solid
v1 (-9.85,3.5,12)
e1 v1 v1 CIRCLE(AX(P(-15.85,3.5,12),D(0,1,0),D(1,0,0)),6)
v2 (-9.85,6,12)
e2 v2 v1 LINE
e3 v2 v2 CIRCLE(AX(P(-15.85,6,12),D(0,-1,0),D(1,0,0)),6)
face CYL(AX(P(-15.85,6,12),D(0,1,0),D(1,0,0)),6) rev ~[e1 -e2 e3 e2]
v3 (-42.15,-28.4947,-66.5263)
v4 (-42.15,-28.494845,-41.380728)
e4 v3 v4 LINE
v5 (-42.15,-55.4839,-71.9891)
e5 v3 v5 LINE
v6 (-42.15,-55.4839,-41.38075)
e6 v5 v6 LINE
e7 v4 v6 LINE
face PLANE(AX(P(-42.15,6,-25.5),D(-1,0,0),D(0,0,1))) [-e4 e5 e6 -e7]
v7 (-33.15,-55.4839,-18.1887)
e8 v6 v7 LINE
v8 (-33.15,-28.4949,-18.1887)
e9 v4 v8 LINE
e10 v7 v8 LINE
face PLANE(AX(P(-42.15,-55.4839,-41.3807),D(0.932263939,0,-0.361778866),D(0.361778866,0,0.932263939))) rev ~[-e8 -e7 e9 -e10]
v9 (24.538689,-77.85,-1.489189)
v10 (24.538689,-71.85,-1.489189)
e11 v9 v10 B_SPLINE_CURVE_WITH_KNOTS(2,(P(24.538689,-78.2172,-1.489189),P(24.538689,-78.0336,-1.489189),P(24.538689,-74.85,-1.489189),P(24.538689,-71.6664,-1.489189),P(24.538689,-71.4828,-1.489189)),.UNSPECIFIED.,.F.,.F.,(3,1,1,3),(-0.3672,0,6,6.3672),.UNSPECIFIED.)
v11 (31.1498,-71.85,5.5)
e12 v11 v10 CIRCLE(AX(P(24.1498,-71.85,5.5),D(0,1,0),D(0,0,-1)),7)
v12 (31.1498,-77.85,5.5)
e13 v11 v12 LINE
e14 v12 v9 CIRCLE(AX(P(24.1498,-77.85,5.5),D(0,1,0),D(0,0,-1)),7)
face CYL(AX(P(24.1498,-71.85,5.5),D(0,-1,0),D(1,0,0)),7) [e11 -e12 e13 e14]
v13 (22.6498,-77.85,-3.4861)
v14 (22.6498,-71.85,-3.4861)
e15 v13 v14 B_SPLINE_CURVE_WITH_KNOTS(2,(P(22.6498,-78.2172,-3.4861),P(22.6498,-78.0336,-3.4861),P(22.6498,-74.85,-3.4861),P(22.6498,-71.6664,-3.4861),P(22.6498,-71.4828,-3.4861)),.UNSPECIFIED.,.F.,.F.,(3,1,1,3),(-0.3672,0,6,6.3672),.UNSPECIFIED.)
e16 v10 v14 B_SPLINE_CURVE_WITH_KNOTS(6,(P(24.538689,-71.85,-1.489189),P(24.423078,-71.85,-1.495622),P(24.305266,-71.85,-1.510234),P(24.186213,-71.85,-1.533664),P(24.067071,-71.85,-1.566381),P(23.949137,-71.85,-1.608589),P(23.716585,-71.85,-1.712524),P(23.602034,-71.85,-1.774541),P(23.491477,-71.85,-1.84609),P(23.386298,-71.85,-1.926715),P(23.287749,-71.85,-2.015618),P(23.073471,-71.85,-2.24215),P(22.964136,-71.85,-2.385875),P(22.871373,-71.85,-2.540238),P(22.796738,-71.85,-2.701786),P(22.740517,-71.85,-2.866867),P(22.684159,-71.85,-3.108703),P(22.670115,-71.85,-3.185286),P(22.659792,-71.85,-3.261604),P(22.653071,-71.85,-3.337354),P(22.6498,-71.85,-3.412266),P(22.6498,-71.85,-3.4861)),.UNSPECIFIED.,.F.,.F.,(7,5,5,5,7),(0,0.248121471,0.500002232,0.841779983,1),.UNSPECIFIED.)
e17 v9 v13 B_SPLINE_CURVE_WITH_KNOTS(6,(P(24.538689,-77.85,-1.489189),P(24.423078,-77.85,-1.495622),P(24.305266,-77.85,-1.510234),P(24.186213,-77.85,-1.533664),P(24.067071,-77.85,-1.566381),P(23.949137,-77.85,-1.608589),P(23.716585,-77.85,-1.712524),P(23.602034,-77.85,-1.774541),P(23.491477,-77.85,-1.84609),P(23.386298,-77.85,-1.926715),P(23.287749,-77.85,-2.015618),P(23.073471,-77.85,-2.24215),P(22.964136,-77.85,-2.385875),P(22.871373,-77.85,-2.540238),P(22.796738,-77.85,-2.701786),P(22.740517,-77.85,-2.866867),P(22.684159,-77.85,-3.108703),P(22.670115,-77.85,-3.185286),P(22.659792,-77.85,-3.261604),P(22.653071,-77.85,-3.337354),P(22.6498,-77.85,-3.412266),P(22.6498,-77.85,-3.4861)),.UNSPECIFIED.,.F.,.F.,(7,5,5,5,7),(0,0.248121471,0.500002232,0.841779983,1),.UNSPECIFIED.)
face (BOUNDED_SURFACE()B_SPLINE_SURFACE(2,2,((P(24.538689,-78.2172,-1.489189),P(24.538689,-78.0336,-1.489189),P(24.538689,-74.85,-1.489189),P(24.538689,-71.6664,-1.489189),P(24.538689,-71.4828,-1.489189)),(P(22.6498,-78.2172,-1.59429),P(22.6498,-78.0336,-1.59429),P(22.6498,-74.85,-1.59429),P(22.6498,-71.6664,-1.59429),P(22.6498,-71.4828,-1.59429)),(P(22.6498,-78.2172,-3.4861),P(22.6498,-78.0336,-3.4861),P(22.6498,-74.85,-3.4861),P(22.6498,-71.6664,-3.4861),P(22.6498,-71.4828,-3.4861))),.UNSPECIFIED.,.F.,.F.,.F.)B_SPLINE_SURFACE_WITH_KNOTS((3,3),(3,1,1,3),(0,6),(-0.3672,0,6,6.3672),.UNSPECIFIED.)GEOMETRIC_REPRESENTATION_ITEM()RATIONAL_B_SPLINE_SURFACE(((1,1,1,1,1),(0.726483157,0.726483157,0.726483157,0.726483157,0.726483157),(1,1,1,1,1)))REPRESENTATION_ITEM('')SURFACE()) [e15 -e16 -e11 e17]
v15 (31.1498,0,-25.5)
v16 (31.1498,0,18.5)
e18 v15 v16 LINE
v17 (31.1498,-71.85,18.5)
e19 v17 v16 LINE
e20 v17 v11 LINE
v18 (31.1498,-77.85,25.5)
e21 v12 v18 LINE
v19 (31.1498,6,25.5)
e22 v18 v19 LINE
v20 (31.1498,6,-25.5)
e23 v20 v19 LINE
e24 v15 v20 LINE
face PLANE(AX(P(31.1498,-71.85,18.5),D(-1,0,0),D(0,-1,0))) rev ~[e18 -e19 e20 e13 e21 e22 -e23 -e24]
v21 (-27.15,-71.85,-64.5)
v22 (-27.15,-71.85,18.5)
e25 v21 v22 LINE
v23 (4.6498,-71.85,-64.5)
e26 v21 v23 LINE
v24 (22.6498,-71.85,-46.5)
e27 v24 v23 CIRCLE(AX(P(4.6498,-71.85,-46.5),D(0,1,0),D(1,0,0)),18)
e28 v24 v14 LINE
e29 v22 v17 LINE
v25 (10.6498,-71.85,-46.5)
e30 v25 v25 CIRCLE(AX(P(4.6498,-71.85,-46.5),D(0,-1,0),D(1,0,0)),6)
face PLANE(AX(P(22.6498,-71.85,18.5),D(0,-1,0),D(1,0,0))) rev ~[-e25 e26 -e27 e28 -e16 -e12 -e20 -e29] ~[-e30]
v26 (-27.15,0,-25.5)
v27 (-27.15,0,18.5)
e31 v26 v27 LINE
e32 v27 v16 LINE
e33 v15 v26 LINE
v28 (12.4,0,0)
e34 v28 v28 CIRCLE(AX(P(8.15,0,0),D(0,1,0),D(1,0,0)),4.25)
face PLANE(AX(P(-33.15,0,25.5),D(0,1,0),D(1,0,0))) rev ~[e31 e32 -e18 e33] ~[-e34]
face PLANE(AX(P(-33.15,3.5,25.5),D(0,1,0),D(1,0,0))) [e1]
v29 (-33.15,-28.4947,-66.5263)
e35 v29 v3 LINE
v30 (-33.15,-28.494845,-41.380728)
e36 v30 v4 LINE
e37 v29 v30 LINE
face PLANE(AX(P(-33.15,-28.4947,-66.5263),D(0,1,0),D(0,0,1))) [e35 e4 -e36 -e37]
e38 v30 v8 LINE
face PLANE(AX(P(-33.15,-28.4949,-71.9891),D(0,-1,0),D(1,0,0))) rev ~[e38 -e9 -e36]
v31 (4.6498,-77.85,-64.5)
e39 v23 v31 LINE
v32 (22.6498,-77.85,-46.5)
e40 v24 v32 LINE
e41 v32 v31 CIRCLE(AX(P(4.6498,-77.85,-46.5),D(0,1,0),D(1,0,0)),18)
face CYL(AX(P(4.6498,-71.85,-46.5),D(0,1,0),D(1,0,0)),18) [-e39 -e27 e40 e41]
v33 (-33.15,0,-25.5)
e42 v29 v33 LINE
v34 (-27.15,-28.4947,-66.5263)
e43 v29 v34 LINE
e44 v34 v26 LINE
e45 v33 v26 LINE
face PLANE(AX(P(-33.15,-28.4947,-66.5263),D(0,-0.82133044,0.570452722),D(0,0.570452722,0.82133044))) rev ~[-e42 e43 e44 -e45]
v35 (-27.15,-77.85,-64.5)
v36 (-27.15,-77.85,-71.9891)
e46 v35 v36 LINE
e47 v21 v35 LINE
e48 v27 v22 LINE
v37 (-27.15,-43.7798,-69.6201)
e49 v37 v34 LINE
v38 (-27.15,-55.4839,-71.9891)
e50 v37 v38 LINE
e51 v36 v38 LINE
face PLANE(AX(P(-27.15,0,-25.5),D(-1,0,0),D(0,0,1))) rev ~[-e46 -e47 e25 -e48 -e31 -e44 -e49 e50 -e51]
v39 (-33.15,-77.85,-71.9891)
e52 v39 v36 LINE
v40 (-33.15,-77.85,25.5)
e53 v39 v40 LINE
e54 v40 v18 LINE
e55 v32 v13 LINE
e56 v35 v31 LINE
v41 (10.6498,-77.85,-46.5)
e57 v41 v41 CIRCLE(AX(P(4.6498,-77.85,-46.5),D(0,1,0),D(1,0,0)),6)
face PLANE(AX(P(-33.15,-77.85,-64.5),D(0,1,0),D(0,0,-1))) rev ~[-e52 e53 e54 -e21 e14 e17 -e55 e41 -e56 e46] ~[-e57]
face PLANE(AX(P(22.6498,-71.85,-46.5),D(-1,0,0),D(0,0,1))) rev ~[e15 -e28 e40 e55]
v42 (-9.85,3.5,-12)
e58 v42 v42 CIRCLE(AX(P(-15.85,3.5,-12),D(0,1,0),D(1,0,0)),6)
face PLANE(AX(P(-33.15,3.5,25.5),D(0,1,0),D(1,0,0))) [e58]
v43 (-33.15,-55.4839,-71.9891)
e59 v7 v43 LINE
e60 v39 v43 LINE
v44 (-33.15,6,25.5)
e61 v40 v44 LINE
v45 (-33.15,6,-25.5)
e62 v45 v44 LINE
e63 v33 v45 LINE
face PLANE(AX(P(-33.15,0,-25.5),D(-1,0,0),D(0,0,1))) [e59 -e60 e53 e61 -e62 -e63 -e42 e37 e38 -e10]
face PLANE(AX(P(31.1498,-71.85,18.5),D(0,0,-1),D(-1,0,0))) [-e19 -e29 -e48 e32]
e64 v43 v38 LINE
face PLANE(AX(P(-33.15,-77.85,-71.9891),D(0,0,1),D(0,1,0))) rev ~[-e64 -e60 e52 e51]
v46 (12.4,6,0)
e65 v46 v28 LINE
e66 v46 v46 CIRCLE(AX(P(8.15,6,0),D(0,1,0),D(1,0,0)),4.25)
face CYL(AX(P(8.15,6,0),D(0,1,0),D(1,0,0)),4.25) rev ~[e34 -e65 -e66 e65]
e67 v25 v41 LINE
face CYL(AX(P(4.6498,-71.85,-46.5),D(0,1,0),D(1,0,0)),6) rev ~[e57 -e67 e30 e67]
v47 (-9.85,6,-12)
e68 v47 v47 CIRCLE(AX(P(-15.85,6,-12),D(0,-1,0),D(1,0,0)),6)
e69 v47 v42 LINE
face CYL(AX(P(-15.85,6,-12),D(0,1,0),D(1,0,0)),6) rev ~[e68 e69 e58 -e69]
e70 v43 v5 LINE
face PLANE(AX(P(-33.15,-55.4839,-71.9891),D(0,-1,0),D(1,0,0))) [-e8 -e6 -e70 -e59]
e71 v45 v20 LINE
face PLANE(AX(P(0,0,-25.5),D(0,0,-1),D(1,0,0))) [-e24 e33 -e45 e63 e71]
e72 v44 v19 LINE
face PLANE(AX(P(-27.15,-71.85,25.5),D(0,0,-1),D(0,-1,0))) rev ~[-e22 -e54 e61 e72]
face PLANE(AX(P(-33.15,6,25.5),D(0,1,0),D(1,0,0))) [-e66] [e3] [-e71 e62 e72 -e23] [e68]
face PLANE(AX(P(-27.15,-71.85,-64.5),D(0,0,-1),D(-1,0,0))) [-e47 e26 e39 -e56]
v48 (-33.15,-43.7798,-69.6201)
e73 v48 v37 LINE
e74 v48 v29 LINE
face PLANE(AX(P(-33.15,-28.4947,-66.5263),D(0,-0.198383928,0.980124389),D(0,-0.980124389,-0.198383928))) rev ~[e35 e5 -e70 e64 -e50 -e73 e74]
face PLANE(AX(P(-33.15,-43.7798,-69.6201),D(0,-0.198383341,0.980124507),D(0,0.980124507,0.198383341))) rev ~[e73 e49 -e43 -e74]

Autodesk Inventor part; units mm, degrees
ref_plane "YZ Plane" through (0, 0, 0) normal (1, 0, 0) x (0, 1, 0)
ref_plane "XZ Plane" through (0, 0, 0) normal (0, 1, 0) x (-1, 0, 0)
ref_plane "XY Plane" through (0, 0, 0) normal (0, 0, 1) x (1, 0, 0)
sketch "Sketch1" plane through (0, 0, 0) normal (0, 1, 0) x (-1, 0, 0)
  line L0 (0, -25.5) -> (-34.15, -25.5)
  line L1 (-34.15, -25.5) -> (-34.15, 0)
  line L2 (-34.15, 0) -> (-34.15, 25.5)
  line L3 (-34.15, 25.5) -> (0, 25.5)
  line L4 (0, 25.5) -> (34.15, 25.5)
  line L5 (34.15, 25.5) -> (34.15, 0)
  line L6 (34.15, 0) -> (34.15, -25.5)
  line L7 (34.15, -25.5) -> (0, -25.5)
  point P0 (0, 0)
extrude "Extrusion1" add sketch "Sketch1" along normal blind 7
sketch "Sketch3" plane through (-34.15, 0, 25.5) normal (0, 0, 1) x (1, 0, 0)
  line L0 (0, 0) -> (0, -78.85)
  point P0 (34.15, 0)
  dimension "d7" = 78.85
sketch "Sketch4" plane through (-34.15, 0, -25.5) normal (-1, 0, 0) x (0, 0, 1)
  line L0 (51, 0) -> (51, -78.85)
  line L1 (51, -78.85) -> (-39, -78.85)
  line L2 (-39, -78.85) -> (-39, -71.85)
  line L3 (0, 0) -> (-39, -71.85)
  line L4 (0, 0) -> (51, 0)
  point P0 (25.5, 0)
  dimension "d10" = 90
  dimension "d11" = 7
extrude "Extrusion2" add sketch "Sketch4" against normal blind 7
sketch "Sketch6" plane through (0, 7, 0) normal (0, 1, 0) x (1, 0, 0)
  line L0 (34.15, -25.5) -> (34.15, 25.5) projected
  line L1 (34.15, 25.5) -> (34.15, 0)
  line L2 (-34.15, 25.5) -> (-34.15, -25.5) projected
  circle A0 centre (8.15, 0) radius 5
  point P0 (0, 0)
  dimension "d20" = 10
extrude "Extrusion4" cut sketch "Sketch6" against normal blind 10
sketch "Sketch7" plane through (-27.15, 0, -25.5) normal (1, 0, 0) x (0, 0, -1)
  line L0 (-51, -78.85) -> (39, -78.85) projected
  line L1 (-51, -78.85) -> (39, -78.85)
  line L2 (39, -78.85) -> (39, -71.85) projected
  line L3 (39, -78.85) -> (39, -71.85)
  line L4 (39, -71.85) -> (-51, -71.85)
  line L5 (-51, 0) -> (-51, -78.85) projected
  line L6 (-51, -78.85) -> (-51, -71.85)
  point P0 (-25.5, 0)
sketch "Sketch8" plane through (0, 0, 0) normal (0, -1, 0) x (1, 0, 0)
  circle A0 centre (8.15, 0) radius 5 projected
  line L0 (8.15, 18.5) -> (34.15, 18.5)
  line L1 (34.15, 25.5) -> (34.15, -25.5) projected
  line L2 (8.15, 25.5) -> (34.15, 25.5)
  line L3 (8.15, 25.5) -> (-27.15, 25.5)
  line L4 (-27.15, 25.5) -> (-27.15, -25.5) projected
  line L5 (8.15, 18.5) -> (-27.15, 18.5)
  line L6 (34.15, 25.5) -> (34.15, 18.5)
  line L7 (-27.15, 25.5) -> (-27.15, 18.5)
  point P0 (0, 0)
extrude "Extrusion6" add sketch "Sketch7" along normal blind 58.5
extrude "Extrusion7" add sketch "Sketch8" along normal blind 78.75 contours L5 L4 L3 L2 L1 L0
sketch "Sketch9" plane through (31.35, 0, -25.5) normal (1, 0, 0) x (0, 0, -1)
  line L0 (-51, -78.75) -> (-51, 7) projected
  line L1 (-44, 0) -> (-44, -71.85) projected
  line L2 (-51, -78.75) -> (-44, -78.75)
  line L3 (-44, -78.75) -> (-44, -71.85)
  line L4 (-44, -71.85) -> (-51, -71.85)
  line L5 (-51, -71.85) -> (-51, -78.75)
  point P0 (-25.5, 0)
extrude "Extrusion8" cut sketch "Sketch9" along normal blind 10
sketch "Sketch10" plane through (0, 7, 0) normal (0, 1, 0) x (1, 0, 0)
  point P0 (0, 0)
sketch "Boceto11" plane through (-34.15, -78.85, -64.5) normal (0, -1, 0) x (1, 0, 0)
  line L0 (72.0718, 89.9914) -> (72.0718, 37.9883)
  line L1 (72.0718, 37.9883) -> (65.5278, 37.9883)
  line L2 (65.5278, 37.9883) -> (65.5278, 89.9914)
  line L3 (72.0718, 89.9914) -> (72.0718, 92.1751)
  line L4 (72.0718, 92.1751) -> (65.5278, 92.1751)
  line L5 (65.5278, 92.1751) -> (65.5278, 89.9914)
  point P0 (34.15, 64.5)
extrude "Extrusión9" cut sketch "Boceto11" against normal blind 1000
sketch "Boceto18" plane through (-34.15, -78.85, 25.5) normal (0, 0, 1) x (1, 0, 0)
  point P0 (34.15, 78.85)
sketch "Boceto23" plane through (-27.15, 0, -25.5) normal (0, 0.4770514, -0.8788754) x (-1, 0, 0)
  point P0 (-27.15, 12.1648)
sketch "Boceto24" plane through (-27.15, 0, -25.5) normal (0, 0, -1) x (-1, 0, 0)
  line L0 (7, -71.85) -> (7, -78.85) projected
  line L1 (7, -78.35) -> (7, -78.85)
  line L2 (7, -78.85) -> (-58.5, -78.85) projected
  line L3 (-58.5, -78.85) -> (-58.5, -77.85)
  line L4 (-58.5, -71.85) -> (-58.5, -78.85) projected
  line L5 (-58.5, -77.85) -> (6, -77.85)
  line L6 (7, -77.85) -> (7, -78.85)
  line L7 (7, -78.85) -> (-58.8392, -78.85)
  line L8 (-58.5278, 7) -> (7, 7) projected
  line L9 (7, -78.85) -> (7, 7)
  line L10 (7, 7) -> (6, 7)
  line L11 (6, 6) -> (6, -77.85)
  line L12 (-58.5278, -71.85) -> (-58.5278, 7) projected
  line L13 (-58.5278, 7) -> (-58.5278, 6)
  line L14 (-58.5278, 6) -> (6, 6)
  line L15 (7, 0) -> (7, 7) projected
  line L16 (7, 6) -> (7, 7)
  line L17 (7, 7) -> (-58.5278, 7)
  point P0 (-27.15, 0)
  dimension "d65" = 1
  dimension "d66" = 1
  dimension "d67" = 1
extrude "Extrusión19" cut sketch "Boceto24" along normal mid plane 1000
sketch "Boceto25" plane through (31.35, -71.85, -64.5) normal (0, 0, -1) x (-1, 0, 0)
  point P0 (31.35, 71.85)
sketch "Boceto27" plane through (31.3778, 0, -25.5) normal (0, 0, -1) x (-1, 0, 0)
  line L0 (0, -71.85) -> (0, 6) projected
  line L1 (0, 6) -> (0.228, 6)
  line L2 (0, 6) -> (64.5278, 6) projected
  line L3 (0.228, 6) -> (0.228, -77.85)
  line L4 (0.0278, -77.85) -> (64.5278, -77.85) projected
  line L5 (0.0278, -71.85) -> (0.0278, -77.85) projected
  line L6 (0.228, -77.85) -> (0.0278, -77.85)
  line L7 (0.0278, -77.85) -> (0, 6)
  line L8 (0, 6) -> (0, -77.85)
  line L9 (0, -77.85) -> (0.0278, -77.85)
  point P0 (31.3778, 0)
  dimension "d73" = 0.228
extrude "Extrusión21" cut sketch "Boceto27" along normal mid plane 1000
sketch "Boceto28" plane through (-33.15, 0, -25.5) normal (-1, 0, 0) x (0, 0, 1)
  point P0 (25.5, 0)
sketch "Boceto30" plane through (-33.15, 0, -25.5) normal (-1, 0, 0) x (0, 0, 1)
  point P0 (25.5, 0)
sketch "Boceto31" plane through (-33.15, 0, -25.5) normal (-1, 0, 0) x (0, 0, 1)
  circle A0 centre (64.38, -38.5153) radius 2.6
  point P0 (25.5, 0)
  point P1 (64.38, -49.4573)
sketch "Boceto32" plane through (-27.15, -71.85, 18.5) normal (0, 1, 0) x (1, 0, 0)
  circle A0 centre (47, 71.5) radius 5 projected
  circle A1 centre (47, 71.5) radius 5
  line L0 (52, 71.5) -> (58.2998, 71.5)
  line L1 (67, 83) -> (67, -7)
  line L2 (58.2998, -7) -> (-6, -7) projected
  line L3 (67, -7) -> (58.2998, -7)
  line L4 (58.2998, -7) -> (58.2998, 83)
  line L5 (47, 76.5) -> (47, 83)
  line L6 (-6, 83) -> (0, 83) projected
  line L7 (-6, 83) -> (-6, 91.5)
  line L8 (-6, 91.5) -> (67, 91.5)
  line L9 (67, 91.5) -> (67, 83)
  line L10 (-6, 83) -> (58.2998, 83)
  point P0 (27.15, 18.5)
extrude "Extrusión23" add sketch "Boceto32" against normal blind 6 contours L4 L10 L6 L7 L8 L9 L1 L3
sketch "Boceto33" plane through (-33.15, -77.85, 25.5) normal (-1, 0, 0) x (0, 0, 1)
  line L0 (0, 83.85) -> (0, 0) projected
  line L1 (0, 74.4354) -> (10.1255, 74.4354)
  line L2 (10.1255, 74.4354) -> (10.1255, 56.6115)
  line L3 (10.9445, 54.9975) -> (18.0243, 49.8171)
  line L4 (18.8039, 48.5979) -> (20.1084, 42.1205)
  line L5 (0, 11.6181) -> (18.1478, 11.6181)
  line L6 (20.1478, 13.6181) -> (20.1478, 41.7256)
  arc A0 (10.1255, 56.6115) -> (10.9445, 54.9975) centre (12.1255, 56.6115) ccw
  arc A1 (18.8039, 48.5979) -> (18.0243, 49.8171) centre (16.8433, 48.203) ccw
  arc A2 (20.1478, 41.7256) -> (20.1084, 42.1205) centre (18.1478, 41.7256) ccw
  arc A3 (18.1478, 11.6181) -> (20.1478, 13.6181) centre (18.1478, 13.6181) ccw
  point P0 (-25.5, 77.85)
  dimension "d91" = 2
extrude "Extrusión24" add sketch "Boceto33" against normal blind 6
extrude "Extrusión25" cut sketch "Boceto31" against normal blind 6
sketch "Boceto34" plane through (-27.15, -77.85, 25.5) normal (1, 0, 0) x (0, 0, -1)
  line L0 (-18.1478, 11.6181) -> (-21.8775, 11.6181)
  line L1 (-21.8775, 11.6181) -> (-21.8775, 48.067)
  line L2 (-21.8775, 48.067) -> (-10.1255, 56.8358)
  line L3 (-10.1255, 74.4354) -> (-10.1255, 56.6115) projected
  line L4 (-10.1255, 56.8358) -> (-10.1255, 48.9642)
  line L5 (-10.1255, 48.9642) -> (-16.6729, 42.1735)
  line L6 (-16.6729, 42.1735) -> (-18.1478, 11.6181)
  point P0 (25.5, 77.85)
extrude "Extrusión26" add sketch "Boceto34" against normal blind 6
fillet "Empalme5" radius 10 3 edges at (-30.15, -21.0142, 35.6255) (-30.15, -29.783, 47.3775) (-30.15, -66.2319, 47.3775)
sketch "Boceto37" plane through (-33.15, 6, 25.5) normal (0, 1, 0) x (1, 0, 0)
  circle A0 centre (41.3, 25.5) radius 6 projected
  line L0 (41.3, 25.5) -> (17.3, 25.5)
  line L1 (17.3, 25.5) -> (17.3, 13.5)
  line L2 (17.3, 13.5) -> (17.3, 37.5)
  circle A1 centre (17.3, 13.5) radius 6
  circle A2 centre (17.3, 37.5) radius 6
  point P0 (33.15, 25.5)
  dimension "d106" = 24
  dimension "d107" = 12
  dimension "d108" = 24
  dimension "d109" = 12
  dimension "d110" = 12
extrude "Extrusión29" cut sketch "Boceto37" against normal blind 2.5 contours A1 | A2
sketch "Boceto39" plane through (-27.15, -71.85, 18.5) normal (0, 1, 0) x (1, 0, 0)
  line L0 (58.2998, -7) -> (58.2998, 0)
  line L1 (58.2998, 44) -> (58.2998, 91.5)
  line L2 (-6, 91.5) -> (67, 91.5) projected
  line L3 (0, 0) -> (58.2998, 0) projected
  line L4 (58.2998, 0) -> (58.2998, -7) projected
  line L5 (58.2998, -7) -> (67, -7) projected
  line L6 (58.2998, -7) -> (67, -7)
  line L7 (67, 91.5) -> (-6, 91.5) projected
  line L8 (67, -7) -> (67, 91.5)
  line L9 (67, 91.5) -> (58.2998, 91.5)
  line L10 (58.2998, 0) -> (58.2998, 44)
  point P0 (27.15, 18.5)
extrude "Extrusión31" cut sketch "Boceto39" against normal blind 10
sketch "Boceto41" plane through (-27.15, -71.85, 18.5) normal (0, 1, 0) x (1, 0, 0)
  line L0 (58.2998, 91.5) -> (58.2998, -7) projected
  line L1 (58.2998, 91.5) -> (31.7998, 91.5)
  line L2 (31.7998, 91.5) -> (31.7998, 65)
  line L3 (31.7998, 65) -> (58.2998, 65)
  line L4 (58.2998, 65) -> (58.2998, 91.5)
  circle A0 centre (31.7998, 65) radius 6
  point P0 (27.15, 18.5)
  dimension "d124" = 26.5
  dimension "d125" = 26.5
  dimension "d126" = 12
extrude "Extrusión32" cut sketch "Boceto41" against normal blind 10 contours A0 L2 L3 | L3 L2 A0
sketch "Sketch42" plane through (-27.15, -71.85, 18.5) normal (0, 1, 0) x (1, 0, 0)
  circle A0 centre (31.7998, 65) radius 6 projected
  line L0 (31.7998, 71) -> (31.7998, 65)
  circle A1 centre (31.7998, 65) radius 18
  line L1 (0, 0) -> (0, 83) projected
  line L2 (0, 83) -> (31.7998, 83)
  line L3 (58.2998, 91.5) -> (-6, 91.5) projected
  line L4 (49.7998, 65) -> (49.7998, 0)
  line L5 (58.2998, 0) -> (0, 0) projected
  line L6 (0, 0) -> (58.2998, 0) projected
  line L7 (49.7998, 0) -> (58.2998, 0)
  line L8 (58.2998, 91.5) -> (58.2998, -7) projected
  line L9 (58.2998, 0) -> (58.2998, 91.5)
  line L10 (0, 83) -> (0, 44) projected
  line L11 (0, 83) -> (-6, 83)
  line L12 (-6, 91.5) -> (-6, 83) projected
  line L13 (-6, 83) -> (-6, 91.5)
  line L14 (58.2998, 91.5) -> (58.2998, 0) projected
  line L15 (-6, 91.5) -> (58.2998, 91.5)
  point P0 (27.15, 18.5)
  point P1 (58.2998, -7)
  dimension "d129" = 36
extrude "Extrusion33" cut sketch "Sketch42" against normal blind 10 contours A1 L2 L11 L12 L3 L8 L5 L4
sketch "Sketch43" plane through (-27.15, -71.85, 18.5) normal (0, 0, -1) x (-1, 0, 0)
  line L0 (6, -6) -> (-58.2998, -6) projected
  line L1 (0, 0) -> (-49.7998, 0) projected
  line L2 (-58.2998, -6) -> (-49.7998, -6)
  line L3 (-49.7998, -6) -> (-49.7998, 0)
  line L4 (-49.7998, 0) -> (-58.2998, 0)
  line L5 (-58.2998, 0) -> (-58.2998, -6)
  point P0 (-27.15, 71.85)
extrude "Extrusion34" add sketch "Sketch43" along normal blind 20
fillet "Fillet7" radius 7 1 edges at (31.1498, -74.85, -1.5)
fillet "Fillet8" radius 2 1 edges at (22.6498, -74.85, -1.5)
sketch "Sketch44" plane through (-33.15, 0, -25.5) normal (-1, 0, 0) x (0, 0, 1)
  line L0 (68.8577, -26.7837) -> (65.1452, -24.0136) projected
  line L1 (61.1255, -3.4146) -> (51, -3.4146) projected
  line L2 (65.1452, -24.0136) -> (51, -24.0136)
  line L3 (51, -24.0136) -> (51, -3.4146)
  line L4 (51, -3.4146) -> (65.1452, -3.4146)
  line L5 (65.1452, -3.4146) -> (65.1452, -24.0136)
  point P0 (25.5, 0)
extrude "Extrusion35" cut sketch "Sketch44" against normal blind 20
sketch "Sketch45" plane through (-33.15, 6, 25.5) normal (0, 1, 0) x (1, 0, 0)
  circle A0 centre (41.3, 25.5) radius 5 projected
  circle A1 centre (41.3, 25.5) radius 4.25
  circle A2 centre (41.3, 25.5) radius 5
  point P0 (33.15, 25.5)
  dimension "d138" = 8.5
extrude "Extrusion36" add sketch "Sketch45" against normal blind 6
sketch "Sketch46" plane through (-33.15, 0, -25.5) normal (-1, 0, 0) x (0, 0, 1)
  point P0 (25.5, 0)
sketch "Sketch47" plane through (-33.15, 0, -25.5) normal (-1, 0, 0) x (0, 0, 1)
  line L0 (-44.1201, -43.7798) -> (-41.0263, -28.4947)
  line L1 (-39, -71.85) -> (0, 0) projected
  line L2 (-41.0263, -28.4947) -> (0, 0)
  line L3 (0, 0) -> (-39, -71.85)
  line L4 (-44.1201, -43.7798) -> (-44.1201, -71.85)
  line L5 (-44.1201, -71.85) -> (-39, -71.85)
  point P0 (25.5, 0)
extrude "Extrusion37" add sketch "Sketch47" against normal blind 6
sketch "Sketch48" plane through (-33.15, 6, -25.5) normal (-1, 0, 0) x (0, 0, 1)
  point P0 (25.5, -6)
sketch "Sketch49" plane through (-33.15, 6, -25.5) normal (-1, 0, 0) x (0, 0, 1)
  point P0 (25.5, -6)
sketch "Sketch50" plane through (-33.15, 6, -25.5) normal (-1, 0, 0) x (0, 0, 1)
  line L0 (-44.1201, -49.7798) -> (-41.0263, -34.4947) projected
  line L1 (-41.0263, -34.4947) -> (-46.4891, -61.4839)
  line L2 (-39, -83.85) -> (51, -83.85) projected
  line L3 (-39, -83.85) -> (-46.4891, -83.85)
  line L4 (-46.4891, -83.85) -> (-46.4891, -61.4839)
  line L5 (-41.0263, -34.4947) -> (-39, -69.2782)
  line L6 (-39, -69.2782) -> (-39, -83.85)
  point P0 (25.5, -6)
extrude "Extrusion38" add sketch "Sketch50" against normal blind 6
sketch "Sketch51" plane through (-33.15, 6, -25.5) normal (-1, 0, 0) x (0, 0, 1)
  line L0 (-41.0263, -34.4947) -> (-46.4891, -61.4839) projected
  line L1 (-41.0263, -34.4947) -> (-46.4891, -61.4839)
  line L2 (-46.4891, -61.4839) -> (-15.8808, -61.4839)
  line L3 (-41.0263, -34.4947) -> (-15.8808, -34.4947)
  line L4 (-15.8808, -34.4947) -> (-15.8808, -61.4839)
  point P0 (25.5, -6)
extrude "Extrusion39" add sketch "Sketch51" along normal blind 9
sketch "Sketch52" plane through (-33.15, -55.4839, -71.9891) normal (0, -1, 0) x (1, 0, 0)
  line L0 (-9, 30.6084) -> (0, 53.8004)
  line L1 (0, 0) -> (0, 97.4891) projected
  line L2 (0, 30.6084) -> (0, 53.8004)
  line L3 (0, 30.6084) -> (-9, 30.6084)
  point P0 (33.15, 71.9891)
extrude "Extrusion40" add sketch "Sketch52" against normal blind 26.989
sketch "Sketch53" plane through (-33.15, -55.4839, -18.1887) normal (-0.9322642, 0, 0.3617781) x (0.3617781, 0, 0.9322642)
  point P0 (28.9496, 55.4839)
sketch "Sketch54" plane through (-33.15, 6, -25.5) normal (-1, 0, 0) x (0, 0, 1)
  line L0 (51, -72.2319) -> (51, -83.85) projected
  line L1 (51, -83.85) -> (86.3988, -83.85)
  line L2 (86.3988, -83.85) -> (86.3988, -18.2813)
  line L3 (86.3988, -18.2813) -> (51, -18.2813)
  line L4 (51, -18.2813) -> (51, -83.85)
  point P0 (25.5, -6)
extrude "Extrusion41" cut sketch "Sketch54" against normal blind 26.989
properties part number "DC23[R][F][2]" material "Aluminio 6061"
